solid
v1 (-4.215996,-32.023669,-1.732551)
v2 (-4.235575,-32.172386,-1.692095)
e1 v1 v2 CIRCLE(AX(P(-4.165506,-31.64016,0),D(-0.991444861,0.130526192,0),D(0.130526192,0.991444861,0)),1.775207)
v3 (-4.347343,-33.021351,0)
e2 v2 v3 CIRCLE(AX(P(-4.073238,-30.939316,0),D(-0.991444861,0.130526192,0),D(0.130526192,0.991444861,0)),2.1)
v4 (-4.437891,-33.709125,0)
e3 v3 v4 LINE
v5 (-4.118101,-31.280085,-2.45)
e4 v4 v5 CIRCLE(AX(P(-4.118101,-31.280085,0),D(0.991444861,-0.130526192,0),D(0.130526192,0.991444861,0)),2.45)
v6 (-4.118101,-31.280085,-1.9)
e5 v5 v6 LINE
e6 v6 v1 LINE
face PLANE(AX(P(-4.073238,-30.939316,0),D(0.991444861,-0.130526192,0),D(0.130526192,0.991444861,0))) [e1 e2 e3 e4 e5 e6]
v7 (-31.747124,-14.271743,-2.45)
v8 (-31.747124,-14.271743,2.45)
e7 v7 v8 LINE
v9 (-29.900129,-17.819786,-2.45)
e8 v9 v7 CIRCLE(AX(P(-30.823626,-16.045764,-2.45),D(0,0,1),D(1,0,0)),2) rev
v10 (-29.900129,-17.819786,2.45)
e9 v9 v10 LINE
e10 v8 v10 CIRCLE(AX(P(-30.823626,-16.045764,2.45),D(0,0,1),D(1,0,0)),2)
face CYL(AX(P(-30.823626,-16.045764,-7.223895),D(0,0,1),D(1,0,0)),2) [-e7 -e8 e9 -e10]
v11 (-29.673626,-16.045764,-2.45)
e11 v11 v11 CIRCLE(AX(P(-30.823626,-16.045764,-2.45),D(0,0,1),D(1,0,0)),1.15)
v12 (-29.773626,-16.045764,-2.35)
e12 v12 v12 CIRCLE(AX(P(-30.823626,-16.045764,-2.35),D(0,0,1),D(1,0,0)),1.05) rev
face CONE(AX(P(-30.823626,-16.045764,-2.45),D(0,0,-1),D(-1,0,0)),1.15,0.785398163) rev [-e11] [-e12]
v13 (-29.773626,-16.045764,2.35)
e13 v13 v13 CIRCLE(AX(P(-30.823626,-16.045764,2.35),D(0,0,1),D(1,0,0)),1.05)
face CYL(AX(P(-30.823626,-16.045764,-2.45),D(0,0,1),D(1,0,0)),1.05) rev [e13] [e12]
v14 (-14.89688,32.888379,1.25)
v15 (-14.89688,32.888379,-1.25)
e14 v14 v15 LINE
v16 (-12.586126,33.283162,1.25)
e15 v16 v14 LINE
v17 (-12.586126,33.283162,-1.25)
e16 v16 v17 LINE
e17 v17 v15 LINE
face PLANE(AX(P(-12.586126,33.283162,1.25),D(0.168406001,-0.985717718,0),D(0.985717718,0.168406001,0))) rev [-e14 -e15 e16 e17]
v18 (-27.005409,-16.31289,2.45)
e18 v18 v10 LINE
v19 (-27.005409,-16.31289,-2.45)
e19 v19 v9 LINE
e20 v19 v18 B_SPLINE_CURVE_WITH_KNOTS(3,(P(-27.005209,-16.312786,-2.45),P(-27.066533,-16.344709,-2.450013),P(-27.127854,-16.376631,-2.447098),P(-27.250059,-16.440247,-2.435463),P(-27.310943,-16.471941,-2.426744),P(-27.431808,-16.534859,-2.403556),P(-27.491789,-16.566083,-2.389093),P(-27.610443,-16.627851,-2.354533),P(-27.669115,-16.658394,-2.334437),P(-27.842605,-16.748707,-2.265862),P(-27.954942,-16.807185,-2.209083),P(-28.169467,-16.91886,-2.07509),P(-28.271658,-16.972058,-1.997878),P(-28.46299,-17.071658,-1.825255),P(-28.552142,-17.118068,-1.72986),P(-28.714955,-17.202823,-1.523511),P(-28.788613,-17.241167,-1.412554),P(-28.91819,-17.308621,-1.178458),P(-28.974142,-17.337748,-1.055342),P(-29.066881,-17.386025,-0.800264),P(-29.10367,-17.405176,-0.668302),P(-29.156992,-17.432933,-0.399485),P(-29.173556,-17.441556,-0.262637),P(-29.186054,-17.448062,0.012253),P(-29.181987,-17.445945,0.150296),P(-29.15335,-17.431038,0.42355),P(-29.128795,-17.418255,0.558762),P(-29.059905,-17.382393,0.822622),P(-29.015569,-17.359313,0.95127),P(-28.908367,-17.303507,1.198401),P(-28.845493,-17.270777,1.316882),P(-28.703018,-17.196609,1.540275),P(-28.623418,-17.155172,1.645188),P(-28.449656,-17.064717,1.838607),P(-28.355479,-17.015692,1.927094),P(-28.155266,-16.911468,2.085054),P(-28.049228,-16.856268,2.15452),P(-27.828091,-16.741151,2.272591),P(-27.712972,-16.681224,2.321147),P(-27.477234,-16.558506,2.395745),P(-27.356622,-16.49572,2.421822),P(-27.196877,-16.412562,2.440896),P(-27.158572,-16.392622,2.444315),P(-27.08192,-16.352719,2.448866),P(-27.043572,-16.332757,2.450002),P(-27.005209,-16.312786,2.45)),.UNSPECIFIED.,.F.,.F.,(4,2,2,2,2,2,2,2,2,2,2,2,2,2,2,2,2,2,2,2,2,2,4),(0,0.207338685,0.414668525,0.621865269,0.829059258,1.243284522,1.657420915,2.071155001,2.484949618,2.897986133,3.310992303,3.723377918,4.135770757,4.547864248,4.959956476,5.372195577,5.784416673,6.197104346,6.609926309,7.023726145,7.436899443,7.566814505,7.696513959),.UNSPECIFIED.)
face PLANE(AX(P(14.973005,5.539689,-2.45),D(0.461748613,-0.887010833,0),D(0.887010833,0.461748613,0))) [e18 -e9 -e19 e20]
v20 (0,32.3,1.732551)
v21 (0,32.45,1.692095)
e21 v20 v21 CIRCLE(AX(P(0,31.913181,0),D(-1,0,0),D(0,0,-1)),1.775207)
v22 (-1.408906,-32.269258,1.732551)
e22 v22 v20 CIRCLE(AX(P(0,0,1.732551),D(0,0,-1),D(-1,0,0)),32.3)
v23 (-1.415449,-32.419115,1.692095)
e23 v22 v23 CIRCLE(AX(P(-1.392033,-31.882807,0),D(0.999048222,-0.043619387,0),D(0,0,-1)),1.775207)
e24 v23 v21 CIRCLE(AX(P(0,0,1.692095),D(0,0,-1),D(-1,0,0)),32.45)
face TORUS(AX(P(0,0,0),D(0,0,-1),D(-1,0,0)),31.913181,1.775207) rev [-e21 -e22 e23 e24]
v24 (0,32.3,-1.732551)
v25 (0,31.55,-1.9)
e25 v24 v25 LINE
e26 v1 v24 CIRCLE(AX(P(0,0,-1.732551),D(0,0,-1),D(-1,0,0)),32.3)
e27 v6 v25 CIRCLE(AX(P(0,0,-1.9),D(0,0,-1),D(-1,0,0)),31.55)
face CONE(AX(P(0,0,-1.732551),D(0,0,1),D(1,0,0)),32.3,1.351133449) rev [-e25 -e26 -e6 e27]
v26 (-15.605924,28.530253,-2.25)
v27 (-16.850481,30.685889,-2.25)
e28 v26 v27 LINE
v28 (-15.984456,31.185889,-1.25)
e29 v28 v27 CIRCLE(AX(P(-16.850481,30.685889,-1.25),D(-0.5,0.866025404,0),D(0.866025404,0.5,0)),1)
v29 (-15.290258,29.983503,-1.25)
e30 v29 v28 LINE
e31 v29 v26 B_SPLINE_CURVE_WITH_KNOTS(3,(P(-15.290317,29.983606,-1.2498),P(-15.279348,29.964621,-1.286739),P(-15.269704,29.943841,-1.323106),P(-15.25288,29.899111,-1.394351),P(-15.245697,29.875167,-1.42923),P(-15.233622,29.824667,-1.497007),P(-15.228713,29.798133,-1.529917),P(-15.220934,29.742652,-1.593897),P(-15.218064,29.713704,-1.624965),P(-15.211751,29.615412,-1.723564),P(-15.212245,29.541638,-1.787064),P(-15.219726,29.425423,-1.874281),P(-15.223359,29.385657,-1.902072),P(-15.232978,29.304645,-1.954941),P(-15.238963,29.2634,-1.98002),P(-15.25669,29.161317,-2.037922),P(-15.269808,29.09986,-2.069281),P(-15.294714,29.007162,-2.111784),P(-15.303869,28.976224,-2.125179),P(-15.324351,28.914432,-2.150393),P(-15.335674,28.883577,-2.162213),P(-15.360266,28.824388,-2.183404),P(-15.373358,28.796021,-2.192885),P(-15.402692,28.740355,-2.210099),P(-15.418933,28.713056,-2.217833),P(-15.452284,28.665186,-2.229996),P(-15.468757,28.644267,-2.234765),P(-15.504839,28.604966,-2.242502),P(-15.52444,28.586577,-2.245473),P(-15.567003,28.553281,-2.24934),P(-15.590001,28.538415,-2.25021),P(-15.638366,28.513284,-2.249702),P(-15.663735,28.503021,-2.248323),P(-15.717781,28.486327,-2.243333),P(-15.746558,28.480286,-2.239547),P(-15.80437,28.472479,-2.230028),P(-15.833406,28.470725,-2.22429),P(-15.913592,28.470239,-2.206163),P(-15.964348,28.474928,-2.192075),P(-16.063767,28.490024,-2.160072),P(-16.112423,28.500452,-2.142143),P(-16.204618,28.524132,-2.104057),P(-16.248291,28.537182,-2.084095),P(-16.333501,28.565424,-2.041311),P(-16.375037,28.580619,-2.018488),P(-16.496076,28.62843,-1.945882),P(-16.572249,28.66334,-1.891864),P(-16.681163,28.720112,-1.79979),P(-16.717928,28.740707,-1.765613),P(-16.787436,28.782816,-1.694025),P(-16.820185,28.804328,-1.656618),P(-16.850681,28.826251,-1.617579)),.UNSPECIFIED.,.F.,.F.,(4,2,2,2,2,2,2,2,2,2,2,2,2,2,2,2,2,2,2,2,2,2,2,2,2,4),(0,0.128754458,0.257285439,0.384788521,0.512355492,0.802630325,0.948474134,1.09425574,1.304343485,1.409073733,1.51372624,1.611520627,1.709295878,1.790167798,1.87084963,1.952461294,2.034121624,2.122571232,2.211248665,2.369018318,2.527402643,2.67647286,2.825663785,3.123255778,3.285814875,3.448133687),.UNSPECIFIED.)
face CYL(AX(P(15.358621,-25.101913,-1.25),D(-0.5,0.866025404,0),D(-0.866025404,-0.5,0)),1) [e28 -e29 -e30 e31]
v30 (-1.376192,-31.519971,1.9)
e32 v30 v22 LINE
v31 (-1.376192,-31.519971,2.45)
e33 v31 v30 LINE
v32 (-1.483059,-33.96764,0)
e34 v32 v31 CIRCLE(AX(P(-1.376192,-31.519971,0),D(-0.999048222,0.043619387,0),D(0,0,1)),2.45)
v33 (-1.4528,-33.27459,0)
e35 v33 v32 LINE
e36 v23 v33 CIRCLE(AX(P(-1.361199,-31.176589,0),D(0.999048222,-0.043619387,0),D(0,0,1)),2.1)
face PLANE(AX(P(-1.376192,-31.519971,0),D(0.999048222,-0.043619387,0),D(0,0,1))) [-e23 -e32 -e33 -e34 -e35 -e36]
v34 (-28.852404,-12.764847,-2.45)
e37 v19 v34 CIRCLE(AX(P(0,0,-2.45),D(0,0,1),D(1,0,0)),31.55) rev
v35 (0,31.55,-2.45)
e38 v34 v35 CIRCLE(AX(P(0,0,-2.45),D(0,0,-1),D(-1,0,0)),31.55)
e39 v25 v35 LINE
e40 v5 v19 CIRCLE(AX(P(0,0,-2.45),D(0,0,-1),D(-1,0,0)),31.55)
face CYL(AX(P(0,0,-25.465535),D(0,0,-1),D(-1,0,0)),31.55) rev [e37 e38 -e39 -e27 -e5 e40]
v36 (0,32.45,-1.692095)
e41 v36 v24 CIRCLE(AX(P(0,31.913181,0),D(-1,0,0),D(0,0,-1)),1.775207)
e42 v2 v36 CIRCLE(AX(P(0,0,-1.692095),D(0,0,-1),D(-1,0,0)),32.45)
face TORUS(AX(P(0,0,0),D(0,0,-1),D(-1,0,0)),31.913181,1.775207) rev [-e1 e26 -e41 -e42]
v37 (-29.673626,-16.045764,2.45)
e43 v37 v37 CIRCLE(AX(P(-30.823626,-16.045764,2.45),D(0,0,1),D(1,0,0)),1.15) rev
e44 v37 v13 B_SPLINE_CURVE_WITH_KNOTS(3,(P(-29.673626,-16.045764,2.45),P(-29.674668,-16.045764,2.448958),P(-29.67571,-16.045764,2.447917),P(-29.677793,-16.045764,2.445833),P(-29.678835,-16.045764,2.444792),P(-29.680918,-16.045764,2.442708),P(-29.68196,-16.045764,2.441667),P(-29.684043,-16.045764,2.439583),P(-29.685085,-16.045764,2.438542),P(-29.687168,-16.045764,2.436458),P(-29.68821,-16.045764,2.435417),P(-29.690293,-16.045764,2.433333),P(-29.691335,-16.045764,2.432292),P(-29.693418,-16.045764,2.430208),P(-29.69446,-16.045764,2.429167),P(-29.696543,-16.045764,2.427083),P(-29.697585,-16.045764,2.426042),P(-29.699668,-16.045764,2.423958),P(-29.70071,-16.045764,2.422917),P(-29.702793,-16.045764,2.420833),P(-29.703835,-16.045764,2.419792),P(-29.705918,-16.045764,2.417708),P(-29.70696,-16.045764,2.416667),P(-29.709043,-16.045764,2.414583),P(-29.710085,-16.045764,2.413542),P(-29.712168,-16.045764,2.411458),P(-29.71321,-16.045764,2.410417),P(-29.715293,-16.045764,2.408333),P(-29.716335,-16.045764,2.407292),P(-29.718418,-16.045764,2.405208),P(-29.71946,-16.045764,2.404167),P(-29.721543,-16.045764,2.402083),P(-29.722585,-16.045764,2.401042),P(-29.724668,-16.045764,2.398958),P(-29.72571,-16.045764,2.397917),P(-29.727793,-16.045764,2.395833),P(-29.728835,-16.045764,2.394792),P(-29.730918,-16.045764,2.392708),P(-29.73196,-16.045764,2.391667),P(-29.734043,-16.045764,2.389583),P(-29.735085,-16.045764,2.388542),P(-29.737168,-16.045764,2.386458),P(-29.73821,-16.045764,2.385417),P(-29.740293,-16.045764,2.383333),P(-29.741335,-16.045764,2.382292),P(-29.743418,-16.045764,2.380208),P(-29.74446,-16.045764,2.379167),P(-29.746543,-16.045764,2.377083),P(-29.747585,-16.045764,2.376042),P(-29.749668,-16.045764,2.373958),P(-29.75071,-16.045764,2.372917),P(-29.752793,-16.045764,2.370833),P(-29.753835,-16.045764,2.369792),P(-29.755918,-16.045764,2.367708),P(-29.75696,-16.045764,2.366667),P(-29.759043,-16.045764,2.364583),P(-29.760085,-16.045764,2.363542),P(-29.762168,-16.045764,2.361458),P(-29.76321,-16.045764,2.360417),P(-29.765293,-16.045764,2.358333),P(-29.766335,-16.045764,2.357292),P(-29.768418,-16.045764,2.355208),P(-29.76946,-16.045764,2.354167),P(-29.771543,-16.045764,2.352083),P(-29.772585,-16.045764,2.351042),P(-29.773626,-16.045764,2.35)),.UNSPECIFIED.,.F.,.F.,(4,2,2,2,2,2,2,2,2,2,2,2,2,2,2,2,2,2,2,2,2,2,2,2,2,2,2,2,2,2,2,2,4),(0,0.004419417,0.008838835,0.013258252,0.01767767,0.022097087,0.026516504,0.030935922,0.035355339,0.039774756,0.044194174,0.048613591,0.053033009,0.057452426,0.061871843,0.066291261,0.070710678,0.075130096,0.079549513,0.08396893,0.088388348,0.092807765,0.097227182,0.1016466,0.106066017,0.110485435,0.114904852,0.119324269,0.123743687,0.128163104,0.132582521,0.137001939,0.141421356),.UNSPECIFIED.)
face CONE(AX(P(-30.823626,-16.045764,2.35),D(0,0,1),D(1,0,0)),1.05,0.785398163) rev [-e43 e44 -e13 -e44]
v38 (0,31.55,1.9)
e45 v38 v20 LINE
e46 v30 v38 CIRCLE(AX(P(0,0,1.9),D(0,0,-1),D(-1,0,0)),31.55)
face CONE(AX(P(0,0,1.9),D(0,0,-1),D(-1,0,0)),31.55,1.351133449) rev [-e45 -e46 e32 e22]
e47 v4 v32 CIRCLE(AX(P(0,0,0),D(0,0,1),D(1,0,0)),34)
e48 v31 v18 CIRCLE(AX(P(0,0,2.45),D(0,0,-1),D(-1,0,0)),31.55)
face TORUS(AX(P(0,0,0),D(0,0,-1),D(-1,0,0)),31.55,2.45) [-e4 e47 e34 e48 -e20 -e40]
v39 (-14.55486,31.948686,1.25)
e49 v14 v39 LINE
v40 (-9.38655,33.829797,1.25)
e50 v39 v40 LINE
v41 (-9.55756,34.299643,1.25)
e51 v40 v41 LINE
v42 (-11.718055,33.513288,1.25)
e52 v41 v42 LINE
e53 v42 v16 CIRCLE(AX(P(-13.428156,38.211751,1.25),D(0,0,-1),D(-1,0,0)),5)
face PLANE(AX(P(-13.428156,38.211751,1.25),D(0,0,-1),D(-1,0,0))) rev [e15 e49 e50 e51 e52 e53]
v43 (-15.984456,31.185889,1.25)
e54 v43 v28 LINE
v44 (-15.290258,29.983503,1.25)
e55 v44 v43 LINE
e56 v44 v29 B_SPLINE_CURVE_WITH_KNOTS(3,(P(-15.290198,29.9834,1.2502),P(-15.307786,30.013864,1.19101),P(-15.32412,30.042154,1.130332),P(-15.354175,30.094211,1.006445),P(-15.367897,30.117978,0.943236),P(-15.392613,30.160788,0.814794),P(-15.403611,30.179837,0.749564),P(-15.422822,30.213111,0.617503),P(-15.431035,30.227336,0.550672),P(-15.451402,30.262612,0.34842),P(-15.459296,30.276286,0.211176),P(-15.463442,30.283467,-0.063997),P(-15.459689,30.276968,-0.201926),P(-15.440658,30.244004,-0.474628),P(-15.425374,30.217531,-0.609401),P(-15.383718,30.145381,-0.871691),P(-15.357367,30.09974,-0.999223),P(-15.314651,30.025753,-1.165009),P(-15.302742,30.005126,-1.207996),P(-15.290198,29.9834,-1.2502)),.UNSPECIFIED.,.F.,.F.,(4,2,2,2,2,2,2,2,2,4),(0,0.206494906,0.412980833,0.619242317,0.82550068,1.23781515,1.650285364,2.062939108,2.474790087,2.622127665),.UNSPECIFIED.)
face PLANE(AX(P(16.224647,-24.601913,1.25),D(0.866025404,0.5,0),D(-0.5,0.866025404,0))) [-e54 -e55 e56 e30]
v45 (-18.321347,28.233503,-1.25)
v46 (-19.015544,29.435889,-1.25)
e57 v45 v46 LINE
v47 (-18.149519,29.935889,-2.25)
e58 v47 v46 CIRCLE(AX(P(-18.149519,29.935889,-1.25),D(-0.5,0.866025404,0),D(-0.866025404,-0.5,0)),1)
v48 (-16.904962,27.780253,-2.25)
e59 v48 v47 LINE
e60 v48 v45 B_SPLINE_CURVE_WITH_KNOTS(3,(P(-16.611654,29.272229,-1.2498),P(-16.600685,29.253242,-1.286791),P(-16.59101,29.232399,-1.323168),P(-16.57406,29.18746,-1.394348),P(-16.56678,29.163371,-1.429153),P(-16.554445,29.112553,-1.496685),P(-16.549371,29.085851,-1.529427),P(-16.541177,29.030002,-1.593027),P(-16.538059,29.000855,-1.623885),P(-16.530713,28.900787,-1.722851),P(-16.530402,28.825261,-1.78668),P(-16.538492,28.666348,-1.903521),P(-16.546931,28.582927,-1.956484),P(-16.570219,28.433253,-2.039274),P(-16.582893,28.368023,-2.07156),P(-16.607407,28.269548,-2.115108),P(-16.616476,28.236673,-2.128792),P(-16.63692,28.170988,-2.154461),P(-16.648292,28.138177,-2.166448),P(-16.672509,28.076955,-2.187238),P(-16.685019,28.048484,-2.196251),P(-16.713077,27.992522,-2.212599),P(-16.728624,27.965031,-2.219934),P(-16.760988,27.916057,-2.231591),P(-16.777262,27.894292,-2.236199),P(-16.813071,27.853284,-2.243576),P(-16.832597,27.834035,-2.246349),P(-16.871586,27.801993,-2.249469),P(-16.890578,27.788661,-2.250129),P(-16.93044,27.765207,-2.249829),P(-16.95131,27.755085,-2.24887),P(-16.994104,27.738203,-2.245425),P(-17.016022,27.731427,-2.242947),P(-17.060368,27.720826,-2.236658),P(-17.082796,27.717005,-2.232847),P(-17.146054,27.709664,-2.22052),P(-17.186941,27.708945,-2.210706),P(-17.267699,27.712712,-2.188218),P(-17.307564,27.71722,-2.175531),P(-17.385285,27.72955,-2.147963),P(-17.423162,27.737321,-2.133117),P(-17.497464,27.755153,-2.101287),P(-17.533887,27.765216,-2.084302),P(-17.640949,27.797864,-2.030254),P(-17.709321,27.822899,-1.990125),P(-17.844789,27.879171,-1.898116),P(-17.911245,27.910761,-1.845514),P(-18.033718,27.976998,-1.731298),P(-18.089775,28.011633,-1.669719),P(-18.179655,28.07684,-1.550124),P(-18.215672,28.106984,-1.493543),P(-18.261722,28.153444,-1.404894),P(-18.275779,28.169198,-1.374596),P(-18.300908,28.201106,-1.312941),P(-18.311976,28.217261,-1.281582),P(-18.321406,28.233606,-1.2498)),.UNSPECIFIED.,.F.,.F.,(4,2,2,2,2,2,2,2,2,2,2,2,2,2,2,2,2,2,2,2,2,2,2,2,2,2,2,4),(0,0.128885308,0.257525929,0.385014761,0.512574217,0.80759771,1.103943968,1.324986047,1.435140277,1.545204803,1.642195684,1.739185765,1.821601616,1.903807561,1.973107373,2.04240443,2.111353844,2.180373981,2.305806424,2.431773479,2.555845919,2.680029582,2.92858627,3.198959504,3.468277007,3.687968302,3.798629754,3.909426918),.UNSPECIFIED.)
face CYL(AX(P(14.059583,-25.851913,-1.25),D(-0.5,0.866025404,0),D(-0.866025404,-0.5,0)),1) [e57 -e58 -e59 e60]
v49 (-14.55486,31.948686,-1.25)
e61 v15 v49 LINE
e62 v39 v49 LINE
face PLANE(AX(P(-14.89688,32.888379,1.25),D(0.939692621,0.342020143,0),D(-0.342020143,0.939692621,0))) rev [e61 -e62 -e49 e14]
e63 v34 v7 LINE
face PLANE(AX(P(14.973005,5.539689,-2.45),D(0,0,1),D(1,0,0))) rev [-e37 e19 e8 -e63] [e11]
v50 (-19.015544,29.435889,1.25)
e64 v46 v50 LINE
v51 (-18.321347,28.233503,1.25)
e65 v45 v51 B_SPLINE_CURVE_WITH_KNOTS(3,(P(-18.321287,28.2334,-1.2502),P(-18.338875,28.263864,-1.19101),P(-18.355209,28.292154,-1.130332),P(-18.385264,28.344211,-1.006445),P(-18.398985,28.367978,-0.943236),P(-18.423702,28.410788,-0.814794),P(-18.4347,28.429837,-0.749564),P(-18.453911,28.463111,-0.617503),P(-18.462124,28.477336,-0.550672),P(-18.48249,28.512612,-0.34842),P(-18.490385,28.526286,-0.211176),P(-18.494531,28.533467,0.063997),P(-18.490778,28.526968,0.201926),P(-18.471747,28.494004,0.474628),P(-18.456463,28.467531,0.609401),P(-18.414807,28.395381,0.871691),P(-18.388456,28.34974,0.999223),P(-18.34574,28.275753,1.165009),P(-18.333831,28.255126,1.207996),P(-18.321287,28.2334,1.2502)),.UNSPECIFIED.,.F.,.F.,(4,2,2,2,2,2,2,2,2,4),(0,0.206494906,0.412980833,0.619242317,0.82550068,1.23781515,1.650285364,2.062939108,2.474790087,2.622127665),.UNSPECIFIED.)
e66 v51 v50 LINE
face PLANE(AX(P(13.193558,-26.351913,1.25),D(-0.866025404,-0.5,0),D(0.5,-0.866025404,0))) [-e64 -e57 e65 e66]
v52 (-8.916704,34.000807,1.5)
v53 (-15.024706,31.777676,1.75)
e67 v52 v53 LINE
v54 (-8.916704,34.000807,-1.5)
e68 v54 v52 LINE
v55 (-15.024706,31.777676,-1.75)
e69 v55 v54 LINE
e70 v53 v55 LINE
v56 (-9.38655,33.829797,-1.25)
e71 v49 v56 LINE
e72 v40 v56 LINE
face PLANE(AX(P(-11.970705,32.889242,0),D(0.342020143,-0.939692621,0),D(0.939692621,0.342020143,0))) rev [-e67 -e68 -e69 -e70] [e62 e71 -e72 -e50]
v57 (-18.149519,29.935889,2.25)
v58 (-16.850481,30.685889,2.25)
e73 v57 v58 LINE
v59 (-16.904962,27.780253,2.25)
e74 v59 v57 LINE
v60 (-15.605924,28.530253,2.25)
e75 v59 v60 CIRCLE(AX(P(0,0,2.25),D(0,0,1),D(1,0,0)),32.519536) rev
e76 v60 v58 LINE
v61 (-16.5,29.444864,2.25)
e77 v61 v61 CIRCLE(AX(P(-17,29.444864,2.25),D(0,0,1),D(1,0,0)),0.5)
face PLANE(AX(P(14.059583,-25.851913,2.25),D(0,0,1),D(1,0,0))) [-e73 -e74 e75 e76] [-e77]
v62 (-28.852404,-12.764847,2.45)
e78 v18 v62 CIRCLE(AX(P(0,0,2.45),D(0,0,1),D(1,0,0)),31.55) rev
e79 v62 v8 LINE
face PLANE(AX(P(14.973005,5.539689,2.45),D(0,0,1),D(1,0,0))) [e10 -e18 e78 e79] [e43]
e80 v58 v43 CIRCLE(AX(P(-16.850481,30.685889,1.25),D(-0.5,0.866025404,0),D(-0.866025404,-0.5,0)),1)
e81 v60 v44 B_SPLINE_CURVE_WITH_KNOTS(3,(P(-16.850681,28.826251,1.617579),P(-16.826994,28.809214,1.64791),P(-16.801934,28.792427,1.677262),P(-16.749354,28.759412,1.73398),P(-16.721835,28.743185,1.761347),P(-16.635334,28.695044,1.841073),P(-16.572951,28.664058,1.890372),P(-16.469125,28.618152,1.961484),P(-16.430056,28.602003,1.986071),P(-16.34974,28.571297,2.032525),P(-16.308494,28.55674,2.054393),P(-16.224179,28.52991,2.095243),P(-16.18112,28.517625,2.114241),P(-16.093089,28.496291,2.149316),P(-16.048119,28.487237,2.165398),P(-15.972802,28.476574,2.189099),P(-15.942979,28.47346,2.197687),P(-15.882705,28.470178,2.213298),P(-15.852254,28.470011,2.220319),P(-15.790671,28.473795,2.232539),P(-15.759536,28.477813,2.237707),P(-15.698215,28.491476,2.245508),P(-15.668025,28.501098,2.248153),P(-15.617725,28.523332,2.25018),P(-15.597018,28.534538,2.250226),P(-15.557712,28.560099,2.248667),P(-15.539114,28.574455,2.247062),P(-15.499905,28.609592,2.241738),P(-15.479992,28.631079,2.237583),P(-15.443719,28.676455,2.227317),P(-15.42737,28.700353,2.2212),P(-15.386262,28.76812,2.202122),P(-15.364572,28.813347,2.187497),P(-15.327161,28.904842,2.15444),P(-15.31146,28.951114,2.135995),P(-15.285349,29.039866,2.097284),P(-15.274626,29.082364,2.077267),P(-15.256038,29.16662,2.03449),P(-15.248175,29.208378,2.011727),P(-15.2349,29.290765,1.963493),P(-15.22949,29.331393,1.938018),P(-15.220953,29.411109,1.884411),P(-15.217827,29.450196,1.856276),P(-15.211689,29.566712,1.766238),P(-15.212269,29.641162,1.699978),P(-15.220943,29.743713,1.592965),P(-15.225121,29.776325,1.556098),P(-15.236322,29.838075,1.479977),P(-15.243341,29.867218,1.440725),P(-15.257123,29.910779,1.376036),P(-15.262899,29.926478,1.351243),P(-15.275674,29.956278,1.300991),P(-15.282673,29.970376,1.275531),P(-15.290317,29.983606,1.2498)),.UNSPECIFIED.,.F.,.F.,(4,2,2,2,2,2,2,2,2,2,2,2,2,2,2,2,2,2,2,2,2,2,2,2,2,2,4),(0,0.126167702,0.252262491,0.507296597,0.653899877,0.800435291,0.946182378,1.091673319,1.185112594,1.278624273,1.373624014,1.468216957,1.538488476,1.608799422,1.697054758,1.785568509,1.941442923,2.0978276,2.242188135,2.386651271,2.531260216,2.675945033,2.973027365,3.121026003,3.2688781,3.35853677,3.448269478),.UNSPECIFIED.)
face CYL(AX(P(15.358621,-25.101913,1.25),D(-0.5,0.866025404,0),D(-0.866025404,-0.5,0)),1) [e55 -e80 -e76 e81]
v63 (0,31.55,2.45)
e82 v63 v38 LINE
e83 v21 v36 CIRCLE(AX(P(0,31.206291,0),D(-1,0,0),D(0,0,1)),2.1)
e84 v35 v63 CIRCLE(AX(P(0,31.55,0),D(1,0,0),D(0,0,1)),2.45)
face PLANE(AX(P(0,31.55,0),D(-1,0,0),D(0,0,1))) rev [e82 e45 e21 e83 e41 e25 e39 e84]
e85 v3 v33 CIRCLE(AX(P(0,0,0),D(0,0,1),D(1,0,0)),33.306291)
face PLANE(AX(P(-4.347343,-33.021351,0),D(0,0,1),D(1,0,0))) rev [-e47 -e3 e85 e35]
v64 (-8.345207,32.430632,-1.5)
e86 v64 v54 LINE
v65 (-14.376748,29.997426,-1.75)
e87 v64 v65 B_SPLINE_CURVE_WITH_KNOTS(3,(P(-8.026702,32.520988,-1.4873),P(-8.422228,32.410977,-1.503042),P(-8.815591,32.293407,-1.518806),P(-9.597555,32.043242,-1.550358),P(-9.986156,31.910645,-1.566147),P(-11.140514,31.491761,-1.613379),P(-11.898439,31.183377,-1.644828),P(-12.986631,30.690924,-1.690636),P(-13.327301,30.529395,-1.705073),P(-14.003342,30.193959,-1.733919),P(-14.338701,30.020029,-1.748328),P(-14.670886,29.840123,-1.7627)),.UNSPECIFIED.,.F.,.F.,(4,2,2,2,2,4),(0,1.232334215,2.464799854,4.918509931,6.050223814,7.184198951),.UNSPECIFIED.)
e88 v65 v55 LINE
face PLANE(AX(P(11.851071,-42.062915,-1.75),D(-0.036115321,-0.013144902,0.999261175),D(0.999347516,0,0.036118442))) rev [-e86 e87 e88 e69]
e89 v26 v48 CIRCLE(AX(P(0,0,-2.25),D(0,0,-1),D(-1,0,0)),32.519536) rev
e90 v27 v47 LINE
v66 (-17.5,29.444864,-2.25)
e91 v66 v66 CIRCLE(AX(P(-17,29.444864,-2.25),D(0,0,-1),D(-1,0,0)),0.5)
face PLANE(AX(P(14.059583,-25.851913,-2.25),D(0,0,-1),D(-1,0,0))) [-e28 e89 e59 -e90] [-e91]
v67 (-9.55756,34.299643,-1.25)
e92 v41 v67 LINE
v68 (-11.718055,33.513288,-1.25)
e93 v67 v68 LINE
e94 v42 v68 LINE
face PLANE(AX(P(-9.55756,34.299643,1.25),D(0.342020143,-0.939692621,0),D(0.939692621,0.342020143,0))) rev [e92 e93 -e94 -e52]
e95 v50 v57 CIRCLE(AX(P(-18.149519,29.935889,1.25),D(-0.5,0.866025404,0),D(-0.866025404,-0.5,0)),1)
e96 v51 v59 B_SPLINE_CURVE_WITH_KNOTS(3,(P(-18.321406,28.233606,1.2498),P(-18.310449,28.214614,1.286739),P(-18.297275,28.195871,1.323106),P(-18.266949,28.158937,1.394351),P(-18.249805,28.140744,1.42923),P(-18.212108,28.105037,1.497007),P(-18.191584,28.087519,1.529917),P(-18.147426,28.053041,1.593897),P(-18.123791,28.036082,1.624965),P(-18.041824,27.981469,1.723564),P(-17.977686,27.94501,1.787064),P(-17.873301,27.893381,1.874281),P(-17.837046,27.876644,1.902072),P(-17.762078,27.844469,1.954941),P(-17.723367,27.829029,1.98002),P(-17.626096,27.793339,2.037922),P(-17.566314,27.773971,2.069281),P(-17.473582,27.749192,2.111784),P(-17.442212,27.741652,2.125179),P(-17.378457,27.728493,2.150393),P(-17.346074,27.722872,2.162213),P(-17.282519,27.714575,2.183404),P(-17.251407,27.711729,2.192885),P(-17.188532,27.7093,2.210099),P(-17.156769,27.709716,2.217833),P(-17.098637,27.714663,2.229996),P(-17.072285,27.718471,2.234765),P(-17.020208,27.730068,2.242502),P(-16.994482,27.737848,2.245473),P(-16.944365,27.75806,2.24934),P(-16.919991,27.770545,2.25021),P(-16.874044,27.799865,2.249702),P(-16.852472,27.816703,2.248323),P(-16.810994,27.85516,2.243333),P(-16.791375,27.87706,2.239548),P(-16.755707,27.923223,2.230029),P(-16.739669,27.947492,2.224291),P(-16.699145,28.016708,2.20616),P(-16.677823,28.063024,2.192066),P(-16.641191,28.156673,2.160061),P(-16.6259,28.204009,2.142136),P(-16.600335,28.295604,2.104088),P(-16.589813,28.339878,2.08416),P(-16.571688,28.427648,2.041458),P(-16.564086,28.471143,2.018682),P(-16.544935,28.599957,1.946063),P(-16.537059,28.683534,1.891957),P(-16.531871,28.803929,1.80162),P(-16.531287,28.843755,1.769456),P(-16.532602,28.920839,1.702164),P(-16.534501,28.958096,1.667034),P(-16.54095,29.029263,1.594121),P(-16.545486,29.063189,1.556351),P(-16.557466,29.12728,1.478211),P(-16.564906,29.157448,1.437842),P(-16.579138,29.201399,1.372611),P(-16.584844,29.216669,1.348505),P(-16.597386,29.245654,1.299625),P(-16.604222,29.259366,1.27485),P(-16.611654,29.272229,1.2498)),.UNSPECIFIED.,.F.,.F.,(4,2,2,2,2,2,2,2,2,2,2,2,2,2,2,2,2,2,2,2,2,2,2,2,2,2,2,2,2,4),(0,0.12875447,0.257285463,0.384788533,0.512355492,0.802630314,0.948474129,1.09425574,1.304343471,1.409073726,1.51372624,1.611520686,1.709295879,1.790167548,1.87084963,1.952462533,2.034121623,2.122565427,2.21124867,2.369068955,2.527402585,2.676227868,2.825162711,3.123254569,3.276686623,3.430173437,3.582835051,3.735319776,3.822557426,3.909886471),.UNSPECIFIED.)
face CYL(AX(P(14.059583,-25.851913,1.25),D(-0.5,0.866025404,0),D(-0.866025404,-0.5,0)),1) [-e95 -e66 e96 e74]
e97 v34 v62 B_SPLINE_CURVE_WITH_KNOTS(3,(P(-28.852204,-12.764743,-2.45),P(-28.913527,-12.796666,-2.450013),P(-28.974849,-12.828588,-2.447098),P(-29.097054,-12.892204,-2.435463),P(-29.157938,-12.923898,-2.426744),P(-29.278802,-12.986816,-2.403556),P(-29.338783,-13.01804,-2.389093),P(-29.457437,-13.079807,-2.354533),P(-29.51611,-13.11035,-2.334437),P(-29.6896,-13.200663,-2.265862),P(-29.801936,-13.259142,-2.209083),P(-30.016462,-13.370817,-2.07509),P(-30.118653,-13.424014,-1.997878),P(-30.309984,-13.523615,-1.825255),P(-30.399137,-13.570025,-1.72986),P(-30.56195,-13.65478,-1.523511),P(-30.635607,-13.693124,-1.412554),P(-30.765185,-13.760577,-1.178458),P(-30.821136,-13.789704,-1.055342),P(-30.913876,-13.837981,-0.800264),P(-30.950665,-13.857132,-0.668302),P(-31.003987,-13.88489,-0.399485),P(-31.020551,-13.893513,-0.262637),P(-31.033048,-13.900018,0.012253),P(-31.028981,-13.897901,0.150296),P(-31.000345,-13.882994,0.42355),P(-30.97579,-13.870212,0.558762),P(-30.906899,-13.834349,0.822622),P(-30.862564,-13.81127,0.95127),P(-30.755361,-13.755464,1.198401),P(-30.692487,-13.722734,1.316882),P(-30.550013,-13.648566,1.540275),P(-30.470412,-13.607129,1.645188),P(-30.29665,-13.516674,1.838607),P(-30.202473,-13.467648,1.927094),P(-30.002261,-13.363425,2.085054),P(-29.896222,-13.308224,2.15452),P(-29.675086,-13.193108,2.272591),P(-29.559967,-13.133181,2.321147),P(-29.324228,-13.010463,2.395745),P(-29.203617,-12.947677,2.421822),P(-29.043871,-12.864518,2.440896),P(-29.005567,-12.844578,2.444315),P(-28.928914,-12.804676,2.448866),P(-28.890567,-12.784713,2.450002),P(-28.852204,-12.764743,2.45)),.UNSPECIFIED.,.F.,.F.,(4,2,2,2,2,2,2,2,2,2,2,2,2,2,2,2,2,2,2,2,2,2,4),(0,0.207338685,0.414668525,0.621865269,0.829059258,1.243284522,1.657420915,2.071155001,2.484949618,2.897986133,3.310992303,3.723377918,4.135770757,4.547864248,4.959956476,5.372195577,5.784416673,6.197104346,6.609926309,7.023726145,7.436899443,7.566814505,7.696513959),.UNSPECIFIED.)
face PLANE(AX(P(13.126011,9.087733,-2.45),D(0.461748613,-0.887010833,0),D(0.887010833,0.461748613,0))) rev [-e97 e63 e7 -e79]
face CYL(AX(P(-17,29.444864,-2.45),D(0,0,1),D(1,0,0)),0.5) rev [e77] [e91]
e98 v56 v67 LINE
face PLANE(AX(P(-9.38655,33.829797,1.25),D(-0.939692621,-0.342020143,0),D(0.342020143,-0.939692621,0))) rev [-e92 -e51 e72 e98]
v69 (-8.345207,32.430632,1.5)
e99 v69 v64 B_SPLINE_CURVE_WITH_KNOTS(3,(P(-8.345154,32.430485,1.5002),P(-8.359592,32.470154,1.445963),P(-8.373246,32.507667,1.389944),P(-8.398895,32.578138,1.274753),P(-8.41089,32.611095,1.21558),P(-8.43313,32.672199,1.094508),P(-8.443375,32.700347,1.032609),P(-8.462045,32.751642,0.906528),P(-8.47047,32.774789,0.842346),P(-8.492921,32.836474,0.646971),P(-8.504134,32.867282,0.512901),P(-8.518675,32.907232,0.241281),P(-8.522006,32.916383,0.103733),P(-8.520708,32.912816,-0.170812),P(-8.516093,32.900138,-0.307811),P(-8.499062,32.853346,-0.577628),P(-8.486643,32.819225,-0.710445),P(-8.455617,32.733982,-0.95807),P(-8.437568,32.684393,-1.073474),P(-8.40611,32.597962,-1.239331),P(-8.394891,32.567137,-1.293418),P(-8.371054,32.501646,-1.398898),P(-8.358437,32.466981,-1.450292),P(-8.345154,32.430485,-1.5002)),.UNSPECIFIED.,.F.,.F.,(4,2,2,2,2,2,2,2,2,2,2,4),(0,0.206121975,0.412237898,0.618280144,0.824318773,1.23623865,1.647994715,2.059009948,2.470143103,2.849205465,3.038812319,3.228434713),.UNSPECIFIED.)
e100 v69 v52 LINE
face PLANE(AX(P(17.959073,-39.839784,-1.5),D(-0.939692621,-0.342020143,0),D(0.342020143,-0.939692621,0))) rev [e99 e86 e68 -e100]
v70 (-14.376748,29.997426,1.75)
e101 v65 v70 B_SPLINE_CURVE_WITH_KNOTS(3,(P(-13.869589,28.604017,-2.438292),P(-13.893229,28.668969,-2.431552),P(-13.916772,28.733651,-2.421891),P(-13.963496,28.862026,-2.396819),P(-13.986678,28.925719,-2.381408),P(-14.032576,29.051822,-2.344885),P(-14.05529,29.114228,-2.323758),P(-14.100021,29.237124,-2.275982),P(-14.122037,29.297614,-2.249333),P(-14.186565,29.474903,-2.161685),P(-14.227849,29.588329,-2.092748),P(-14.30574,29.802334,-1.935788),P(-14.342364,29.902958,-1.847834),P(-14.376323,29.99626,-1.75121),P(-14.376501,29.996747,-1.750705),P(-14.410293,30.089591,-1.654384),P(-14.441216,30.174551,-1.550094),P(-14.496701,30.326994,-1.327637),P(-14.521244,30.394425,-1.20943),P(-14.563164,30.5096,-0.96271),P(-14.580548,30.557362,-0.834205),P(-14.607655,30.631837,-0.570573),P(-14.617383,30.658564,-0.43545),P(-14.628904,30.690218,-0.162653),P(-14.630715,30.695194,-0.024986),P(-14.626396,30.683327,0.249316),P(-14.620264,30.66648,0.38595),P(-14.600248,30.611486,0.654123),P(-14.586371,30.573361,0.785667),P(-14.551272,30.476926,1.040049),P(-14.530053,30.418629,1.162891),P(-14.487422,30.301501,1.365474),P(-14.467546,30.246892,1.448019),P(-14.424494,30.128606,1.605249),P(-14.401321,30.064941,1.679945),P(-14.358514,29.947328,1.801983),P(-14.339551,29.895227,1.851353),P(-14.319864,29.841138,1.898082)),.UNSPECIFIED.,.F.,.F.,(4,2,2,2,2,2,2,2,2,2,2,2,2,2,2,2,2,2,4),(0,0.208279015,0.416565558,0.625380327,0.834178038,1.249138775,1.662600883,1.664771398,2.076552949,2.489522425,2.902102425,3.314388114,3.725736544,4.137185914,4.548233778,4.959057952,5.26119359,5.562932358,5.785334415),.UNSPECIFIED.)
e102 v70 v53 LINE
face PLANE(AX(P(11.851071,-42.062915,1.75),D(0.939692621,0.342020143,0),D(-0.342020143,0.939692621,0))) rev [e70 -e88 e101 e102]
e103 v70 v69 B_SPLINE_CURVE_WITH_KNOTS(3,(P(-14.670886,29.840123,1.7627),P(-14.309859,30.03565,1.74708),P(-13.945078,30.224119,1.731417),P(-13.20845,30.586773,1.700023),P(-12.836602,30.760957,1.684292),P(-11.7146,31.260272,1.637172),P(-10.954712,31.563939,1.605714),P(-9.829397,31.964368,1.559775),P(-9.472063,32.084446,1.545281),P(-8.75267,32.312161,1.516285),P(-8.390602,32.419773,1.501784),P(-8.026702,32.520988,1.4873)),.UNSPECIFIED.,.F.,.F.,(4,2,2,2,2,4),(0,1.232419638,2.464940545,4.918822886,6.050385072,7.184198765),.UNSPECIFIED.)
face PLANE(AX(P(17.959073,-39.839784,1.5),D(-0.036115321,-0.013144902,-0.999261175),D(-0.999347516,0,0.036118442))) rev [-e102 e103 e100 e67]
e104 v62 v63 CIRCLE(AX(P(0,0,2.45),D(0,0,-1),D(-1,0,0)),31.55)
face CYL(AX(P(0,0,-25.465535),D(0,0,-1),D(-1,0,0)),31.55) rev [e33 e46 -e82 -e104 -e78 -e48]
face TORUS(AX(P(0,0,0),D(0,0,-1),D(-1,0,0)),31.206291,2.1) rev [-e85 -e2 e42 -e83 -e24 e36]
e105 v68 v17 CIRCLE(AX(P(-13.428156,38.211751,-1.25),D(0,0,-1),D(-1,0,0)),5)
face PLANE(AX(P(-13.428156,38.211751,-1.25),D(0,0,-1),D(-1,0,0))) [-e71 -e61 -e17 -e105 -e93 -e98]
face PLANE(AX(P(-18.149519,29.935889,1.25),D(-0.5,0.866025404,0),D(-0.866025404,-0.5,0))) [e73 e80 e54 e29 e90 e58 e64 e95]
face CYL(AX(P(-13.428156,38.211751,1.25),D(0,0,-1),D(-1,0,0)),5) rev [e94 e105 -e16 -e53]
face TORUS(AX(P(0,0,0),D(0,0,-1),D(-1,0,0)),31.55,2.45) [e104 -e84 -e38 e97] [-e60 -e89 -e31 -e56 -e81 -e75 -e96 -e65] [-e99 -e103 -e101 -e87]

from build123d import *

# Parameters (mm, degrees)
REVOLVE1_ANGLE                 = 177.5
BOSS_EXTRUDE1_REACH            = 72.435
BOSS_EXTRUDE1_END_MAJOR_RADIUS = 31.55
BOSS_EXTRUDE1_END_MINOR_RADIUS = 2.45
BOSS_EXTRUDE2_DEPTH            = 1.25
BOSS_EXTRUDE3_REACH            = 68.663
BOSS_EXTRUDE3_END_RADIUS       = 31.55
SKETCH7_R                      = 0.5
CUT_EXTRUDE1_DEPTH             = 49.523762708
BOSS_EXTRUDE4_START            = -2.45
BOSS_EXTRUDE4_DEPTH            = 4.9
BOSS_EXTRUDE5_DEPTH            = 4.9
SKETCH11_R                     = 1.05
CUT_EXTRUDE2_DEPTH             = 49.543542798
CHAMFER1_SIZE                  = 0.1
CUT_REVOLVE4_ANGLE             = 5


# Read off the part's stored shape, not the designer's step: Boss-Extrude4
with BuildPart() as part:
    # Sketch1 → Revolve1 (revolve)
    with BuildSketch(Plane(origin=(0, 0, 0), x_dir=(0, 0, -1), z_dir=(1, 0, 0))):
        with BuildLine():
            Line((-1.9, 31.55), (-2.45, 31.55))
            ThreePointArc((-2.45, 31.55), (0, 34), (2.45, 31.55))
            Line((2.45, 31.55), (1.9, 31.55))
            Line((1.9, 31.55), (1.732550899, 32.3))
            ThreePointArc((1.732550899, 32.3), (1.713964889, 32.375442776), (1.692095441, 32.45))
            ThreePointArc((1.692095441, 32.45), (0, 33.306290622), (-1.692095441, 32.45))
            ThreePointArc((-1.692095441, 32.45), (-1.713964889, 32.375442776), (-1.732550899, 32.3))
            Line((-1.732550899, 32.3), (-1.9, 31.55))
        make_face()
    revolve(axis=Axis((0, 0, -25.465534681), (0, 0, 1)), revolution_arc=REVOLVE1_ANGLE)



with BuildPart() as body_2:
    # Boss-Extrude1: up to this torus (the profile starts outside it)
    boss_extrude1_end = Plane(origin=(0, 0, 0), z_dir=(0, 0, -1)) * Torus(BOSS_EXTRUDE1_END_MAJOR_RADIUS, BOSS_EXTRUDE1_END_MINOR_RADIUS, mode=Mode.PRIVATE)
    # Sketch4 → Boss-Extrude1 (new, up to the surface)
    with BuildSketch(Plane(origin=(-11.970705016, 32.889241728, 0), x_dir=(-0.9396926207859083, -0.34202014332566943, 0), z_dir=(0.34202014332566943, -0.9396926207859083, 0)), mode=Mode.PRIVATE) as boss_extrude1_sk1:
        Polygon((3.25, 1.75), (-3.25, 1.5), (-3.25, -1.5), (3.25, -1.75), align=None)
    boss_extrude1_tool1 = extrude(boss_extrude1_sk1.sketch, amount=BOSS_EXTRUDE1_REACH, mode=Mode.PRIVATE) - boss_extrude1_end
    add(boss_extrude1_tool1.solids().sort_by_distance((-12.049013, 32.86074, 0))[0])


with BuildPart() as part_1:
    add(part.part)

    add(body_2.part)  # Boss-Extrude2 merges body 2
    # Sketch5 → Boss-Extrude2 (add, symmetric)
    with BuildSketch(Plane.XY):
        with BuildLine():
            Line((-14.896879867, 32.888378954), (-14.554859724, 31.948686333))
            Line((-14.554859724, 31.948686333), (-9.386550309, 33.829797122))
            Line((-9.386550309, 33.829797122), (-9.557560381, 34.299643432))
            Line((-9.557560381, 34.299643432), (-11.718054934, 33.513287723))
            ThreePointArc((-11.718054934, 33.513287723), (-12.14691319, 33.378696125), (-12.586125644, 33.28316224))
            Line((-12.586125644, 33.28316224), (-14.896879867, 32.888378954))
        make_face()
    extrude(amount=BOSS_EXTRUDE2_DEPTH, both=True)

    # Boss-Extrude3: up to this cylinder (the profile starts outside it)
    boss_extrude3_end = Plane(origin=(0, 0, 0), z_dir=(0, 0, -1)) * Cylinder(BOSS_EXTRUDE3_END_RADIUS, 201.426, mode=Mode.PRIVATE)
    # Sketch6 → Boss-Extrude3 (add, up to the surface)
    with BuildSketch(Plane(origin=(-17.5, 30.310889132, 0), x_dir=(0.866025403784438, 0.5000000000000012, 0), z_dir=(-0.5000000000000012, 0.866025403784438, 0)), mode=Mode.PRIVATE) as boss_extrude3_sk1:
        with BuildLine():
            Line((-0.75, -2.25), (0.75, -2.25))
            ThreePointArc((0.75, -2.25), (1.457106781, -1.957106781), (1.75, -1.25))
            Line((1.75, -1.25), (1.75, 1.25))
            ThreePointArc((1.75, 1.25), (1.457106781, 1.957106781), (0.75, 2.25))
            Line((0.75, 2.25), (-0.75, 2.25))
            ThreePointArc((-0.75, 2.25), (-1.457106781, 1.957106781), (-1.75, 1.25))
            Line((-1.75, 1.25), (-1.75, -1.25))
            ThreePointArc((-1.75, -1.25), (-1.457106781, -1.957106781), (-0.75, -2.25))
        make_face()
    boss_extrude3_tool1 = extrude(boss_extrude3_sk1.sketch, amount=-BOSS_EXTRUDE3_REACH, mode=Mode.PRIVATE) - boss_extrude3_end
    add(boss_extrude3_tool1.solids().sort_by_distance((-17.5, 30.310889, 0))[0])

    # Sketch7 → Cut-Extrude1 (cut, through all)
    with BuildSketch(Plane.XY.offset(2.25)):
        with Locations((-17, 29.444863729)):
            Circle(SKETCH7_R)
    extrude(amount=-CUT_EXTRUDE1_DEPTH, mode=Mode.SUBTRACT)

    # Boss-Extrude4 outline → Boss-Extrude4 (add)
    with BuildSketch(Plane.XY.offset(BOSS_EXTRUDE4_START)):
        with BuildLine():
            Line((-29.900129226, -17.819785976), (-27.005409062, -16.312890038))
            ThreePointArc((-27.005409062, -16.312890038), (-27.985191787, -14.568168747), (-28.852403515, -12.764846705))
            Line((-28.852403515, -12.764846705), (-31.747123679, -14.271742644))
            Line((-31.747123679, -14.271742644), (-29.900129226, -17.819785976))
        make_face()
    extrude(amount=BOSS_EXTRUDE4_DEPTH)

    # Sketch10 → Boss-Extrude5 (add)
    with BuildSketch(Plane.XY.offset(2.45)):
        with BuildLine():
            Line((-31.747123679, -14.271742644), (-29.900129226, -17.819785976))
            ThreePointArc((-29.900129226, -17.819785976), (-32.597648119, -16.969261536), (-31.747123679, -14.271742644))
        make_face()
    extrude(amount=-BOSS_EXTRUDE5_DEPTH)

    # Sketch11 → Cut-Extrude2 (cut, through all)
    with BuildSketch(Plane.XY.offset(2.45)):
        with Locations((-30.823626453, -16.04576431)):
            Circle(SKETCH11_R)
    extrude(amount=-CUT_EXTRUDE2_DEPTH, mode=Mode.SUBTRACT)

    # Chamfer1
    chamfer1_edges = [part_1.edges().sort_by_distance(p)[0] for p in [
        (-31.873626453, -16.04576431, -2.45),
        (-31.873626453, -16.04576431, 2.45),
    ]]
    chamfer(chamfer1_edges, length=CHAMFER1_SIZE)

    # Sketch12 → Cut-Revolve2 (revolve, cut)
    with BuildSketch(Plane(origin=(0, 0, 0), x_dir=(0, 0, -1), z_dir=(1, 0, 0))):
        with BuildLine():
            Line((-1.9, 31.55), (1.9, 31.55))
            Line((1.9, 31.55), (1.732550899, 32.3))
            ThreePointArc((1.732550899, 32.3), (1.713964889, 32.375442776), (1.692095441, 32.45))
            ThreePointArc((1.692095441, 32.45), (0, 33.306290622), (-1.692095441, 32.45))
            ThreePointArc((-1.692095441, 32.45), (-1.713964889, 32.375442776), (-1.732550899, 32.3))
            Line((-1.732550899, 32.3), (-1.9, 31.55))
        make_face()
    revolve(axis=Axis((0, 0, -14.066037571), (0, 0, 1)), mode=Mode.SUBTRACT)

    # Sketch13 → Cut-Revolve4 (revolve, cut)
    with BuildSketch(Plane(origin=(0, 0, 0), x_dir=(0, 0, -1), z_dir=(0.999048221581858, -0.043619387365329415, 0))):
        with BuildLine():
            Line((0, -33.306290622), (0, -34))
            ThreePointArc((0, -34), (1.732411614, -33.282411614), (2.45, -31.55))
            Line((2.45, -31.55), (1.9, -31.55))
            Line((1.9, -31.55), (1.732550899, -32.3))
            ThreePointArc((1.732550899, -32.3), (1.713964889, -32.375442776), (1.692095441, -32.45))
            ThreePointArc((1.692095441, -32.45), (0.948211555, -33.080028823), (0, -33.306290622))
        make_face()
    revolve(axis=Axis((0, 0, -14.693028928), (0, 0, -1)), revolution_arc=CUT_REVOLVE4_ANGLE, mode=Mode.SUBTRACT)


solid = part_1.part
